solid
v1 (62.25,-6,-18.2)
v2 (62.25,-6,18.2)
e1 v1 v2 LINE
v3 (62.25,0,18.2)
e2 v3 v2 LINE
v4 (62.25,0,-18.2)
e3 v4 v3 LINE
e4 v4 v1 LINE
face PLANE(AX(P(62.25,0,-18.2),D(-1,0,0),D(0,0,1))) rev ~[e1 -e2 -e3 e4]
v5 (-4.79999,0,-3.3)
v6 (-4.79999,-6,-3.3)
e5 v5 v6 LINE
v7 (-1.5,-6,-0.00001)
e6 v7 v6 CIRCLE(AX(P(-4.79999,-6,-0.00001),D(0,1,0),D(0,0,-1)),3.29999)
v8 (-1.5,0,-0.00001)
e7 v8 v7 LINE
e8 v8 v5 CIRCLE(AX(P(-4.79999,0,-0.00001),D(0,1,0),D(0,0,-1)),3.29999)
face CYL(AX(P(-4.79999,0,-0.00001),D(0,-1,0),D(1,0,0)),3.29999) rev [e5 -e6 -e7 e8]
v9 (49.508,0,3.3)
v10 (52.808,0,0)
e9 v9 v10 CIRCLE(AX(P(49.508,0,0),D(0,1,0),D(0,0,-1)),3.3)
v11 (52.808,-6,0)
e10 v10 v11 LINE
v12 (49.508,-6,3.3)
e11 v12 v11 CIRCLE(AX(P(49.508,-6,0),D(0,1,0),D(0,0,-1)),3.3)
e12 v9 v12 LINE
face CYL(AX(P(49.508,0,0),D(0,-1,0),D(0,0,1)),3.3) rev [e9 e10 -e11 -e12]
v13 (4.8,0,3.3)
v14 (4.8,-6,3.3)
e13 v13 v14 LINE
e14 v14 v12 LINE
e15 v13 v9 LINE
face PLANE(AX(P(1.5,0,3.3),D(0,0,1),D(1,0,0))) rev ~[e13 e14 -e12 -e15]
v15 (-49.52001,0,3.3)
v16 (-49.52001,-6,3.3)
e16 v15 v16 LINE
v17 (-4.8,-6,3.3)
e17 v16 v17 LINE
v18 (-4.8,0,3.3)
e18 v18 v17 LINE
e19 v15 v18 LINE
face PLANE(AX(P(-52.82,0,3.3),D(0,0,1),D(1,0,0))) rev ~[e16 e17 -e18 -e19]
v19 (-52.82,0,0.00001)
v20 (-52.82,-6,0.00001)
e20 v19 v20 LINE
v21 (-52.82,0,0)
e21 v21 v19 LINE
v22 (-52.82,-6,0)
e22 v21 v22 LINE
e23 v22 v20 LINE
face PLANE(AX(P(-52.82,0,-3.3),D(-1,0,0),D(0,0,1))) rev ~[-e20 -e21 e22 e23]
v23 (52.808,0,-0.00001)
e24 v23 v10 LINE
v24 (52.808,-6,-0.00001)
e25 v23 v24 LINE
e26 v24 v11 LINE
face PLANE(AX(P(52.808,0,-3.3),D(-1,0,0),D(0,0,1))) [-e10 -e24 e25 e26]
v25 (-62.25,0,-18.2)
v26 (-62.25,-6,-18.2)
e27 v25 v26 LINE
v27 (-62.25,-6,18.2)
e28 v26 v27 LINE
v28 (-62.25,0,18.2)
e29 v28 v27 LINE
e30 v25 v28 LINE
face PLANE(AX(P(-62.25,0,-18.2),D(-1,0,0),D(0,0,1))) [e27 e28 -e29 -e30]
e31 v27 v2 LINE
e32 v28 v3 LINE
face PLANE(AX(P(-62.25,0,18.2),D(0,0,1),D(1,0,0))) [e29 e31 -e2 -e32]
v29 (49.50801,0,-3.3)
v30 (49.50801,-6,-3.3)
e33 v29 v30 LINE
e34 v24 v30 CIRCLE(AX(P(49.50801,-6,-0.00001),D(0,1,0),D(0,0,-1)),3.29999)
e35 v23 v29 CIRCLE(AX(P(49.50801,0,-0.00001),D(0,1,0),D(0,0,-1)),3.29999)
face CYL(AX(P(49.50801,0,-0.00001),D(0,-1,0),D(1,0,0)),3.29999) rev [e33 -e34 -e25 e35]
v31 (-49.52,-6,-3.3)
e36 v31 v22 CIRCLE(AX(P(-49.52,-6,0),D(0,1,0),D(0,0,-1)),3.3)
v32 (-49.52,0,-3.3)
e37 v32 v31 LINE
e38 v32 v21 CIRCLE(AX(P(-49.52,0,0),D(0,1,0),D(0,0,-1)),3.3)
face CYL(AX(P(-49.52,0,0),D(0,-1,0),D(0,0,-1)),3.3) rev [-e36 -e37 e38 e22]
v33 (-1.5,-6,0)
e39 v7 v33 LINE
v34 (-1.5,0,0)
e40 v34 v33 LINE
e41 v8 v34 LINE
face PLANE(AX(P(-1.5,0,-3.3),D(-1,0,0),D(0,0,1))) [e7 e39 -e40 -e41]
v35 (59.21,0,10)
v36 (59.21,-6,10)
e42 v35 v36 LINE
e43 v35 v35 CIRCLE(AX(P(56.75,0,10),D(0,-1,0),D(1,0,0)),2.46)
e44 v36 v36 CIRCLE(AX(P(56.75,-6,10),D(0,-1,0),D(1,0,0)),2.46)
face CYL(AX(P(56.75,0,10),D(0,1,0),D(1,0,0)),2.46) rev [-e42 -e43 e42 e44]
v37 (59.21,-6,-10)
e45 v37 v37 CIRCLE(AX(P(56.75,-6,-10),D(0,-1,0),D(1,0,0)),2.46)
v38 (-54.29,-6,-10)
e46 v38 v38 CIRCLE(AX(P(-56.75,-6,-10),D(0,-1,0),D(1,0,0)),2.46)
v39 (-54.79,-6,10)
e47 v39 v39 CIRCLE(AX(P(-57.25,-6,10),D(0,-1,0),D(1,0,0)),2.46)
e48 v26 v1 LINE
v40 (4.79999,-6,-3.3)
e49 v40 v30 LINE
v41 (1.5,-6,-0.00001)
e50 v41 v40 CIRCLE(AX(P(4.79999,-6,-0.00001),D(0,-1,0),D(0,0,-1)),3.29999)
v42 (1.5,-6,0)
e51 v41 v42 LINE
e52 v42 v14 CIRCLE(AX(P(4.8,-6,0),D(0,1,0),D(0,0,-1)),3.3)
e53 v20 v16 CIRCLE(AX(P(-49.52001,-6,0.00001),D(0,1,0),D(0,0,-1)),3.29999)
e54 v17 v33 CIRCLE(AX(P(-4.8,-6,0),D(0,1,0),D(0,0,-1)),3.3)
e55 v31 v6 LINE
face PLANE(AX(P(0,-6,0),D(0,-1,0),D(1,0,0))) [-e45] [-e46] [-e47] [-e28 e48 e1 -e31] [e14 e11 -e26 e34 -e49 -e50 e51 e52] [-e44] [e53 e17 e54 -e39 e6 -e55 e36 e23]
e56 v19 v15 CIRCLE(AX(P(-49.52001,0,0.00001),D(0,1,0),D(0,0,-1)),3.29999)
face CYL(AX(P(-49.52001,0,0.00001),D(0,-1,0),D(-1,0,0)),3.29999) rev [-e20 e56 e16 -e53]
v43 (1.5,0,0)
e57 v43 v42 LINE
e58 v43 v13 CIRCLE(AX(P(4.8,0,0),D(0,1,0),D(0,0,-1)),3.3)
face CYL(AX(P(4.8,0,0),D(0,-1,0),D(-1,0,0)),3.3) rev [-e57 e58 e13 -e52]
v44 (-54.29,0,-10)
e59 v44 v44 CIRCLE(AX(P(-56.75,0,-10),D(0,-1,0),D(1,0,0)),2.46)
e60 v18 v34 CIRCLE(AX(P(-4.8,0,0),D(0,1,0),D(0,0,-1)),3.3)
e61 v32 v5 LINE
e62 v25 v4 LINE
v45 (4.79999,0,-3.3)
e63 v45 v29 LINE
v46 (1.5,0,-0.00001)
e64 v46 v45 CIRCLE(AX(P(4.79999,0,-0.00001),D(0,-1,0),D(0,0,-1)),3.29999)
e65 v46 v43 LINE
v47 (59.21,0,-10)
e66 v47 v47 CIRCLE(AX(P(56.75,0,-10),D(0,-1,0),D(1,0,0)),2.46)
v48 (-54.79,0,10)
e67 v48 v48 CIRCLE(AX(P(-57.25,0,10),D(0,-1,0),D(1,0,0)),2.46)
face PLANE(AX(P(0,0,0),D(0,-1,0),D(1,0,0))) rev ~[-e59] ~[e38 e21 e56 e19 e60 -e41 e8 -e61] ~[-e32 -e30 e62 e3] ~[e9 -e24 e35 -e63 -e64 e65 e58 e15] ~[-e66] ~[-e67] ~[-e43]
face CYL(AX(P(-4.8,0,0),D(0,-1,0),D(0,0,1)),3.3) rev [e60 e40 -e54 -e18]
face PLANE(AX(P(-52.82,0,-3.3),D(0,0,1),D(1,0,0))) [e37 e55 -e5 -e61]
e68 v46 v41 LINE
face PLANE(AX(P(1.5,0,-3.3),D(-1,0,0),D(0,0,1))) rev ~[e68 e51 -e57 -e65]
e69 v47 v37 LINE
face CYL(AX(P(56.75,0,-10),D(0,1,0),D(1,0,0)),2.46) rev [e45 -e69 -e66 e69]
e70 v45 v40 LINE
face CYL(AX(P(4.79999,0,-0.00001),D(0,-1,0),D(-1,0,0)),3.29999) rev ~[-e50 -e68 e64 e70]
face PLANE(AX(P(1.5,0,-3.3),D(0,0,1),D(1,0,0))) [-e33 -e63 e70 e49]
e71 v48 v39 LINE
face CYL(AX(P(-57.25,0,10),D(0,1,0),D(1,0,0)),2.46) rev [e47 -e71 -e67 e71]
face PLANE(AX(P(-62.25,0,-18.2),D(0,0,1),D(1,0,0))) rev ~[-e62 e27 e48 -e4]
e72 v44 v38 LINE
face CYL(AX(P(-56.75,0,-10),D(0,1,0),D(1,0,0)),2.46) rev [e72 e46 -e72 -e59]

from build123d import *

# Parameters (mm, degrees)
F0_W     = 124.5
F0_H     = 36.4
F0_R     = 2.46
F0_W_2   = 51.32
F0_H_2   = 6.6
F0_W_3   = 51.308
F1_DEPTH = 6
F2_R     = 3.3
F3_R     = 3.29999
F4_R     = 3.3
F5_R     = 3.29999
F6_R     = 3.3
F7_R     = 3.29999
F8_R     = 3.3
F9_R     = 3.29999


# Not quite as in the source:
# - a fillet or chamfer is up to 0.001 mm smaller than in the source, because OpenCascade refuses the exact size


with BuildPart() as f1:
    # F0 (on Front) → F1 (new body)
    with BuildSketch(Plane.XZ):
        Rectangle(F0_W, F0_H)
        with Locations((-56.75, -10)):
            Circle(F0_R, mode=Mode.SUBTRACT)
        with Locations((-27.16, 0)):
            Rectangle(F0_W_2, F0_H_2, mode=Mode.SUBTRACT)
        with Locations((56.75, -10)):
            Circle(F0_R, mode=Mode.SUBTRACT)
        with Locations((27.154, 0)):
            Rectangle(F0_W_3, F0_H_2, mode=Mode.SUBTRACT)
        with Locations((-57.25, 10)):
            Circle(F0_R, mode=Mode.SUBTRACT)
        with Locations((56.75, 10)):
            Circle(F0_R, mode=Mode.SUBTRACT)
    extrude(amount=F1_DEPTH)

    # F2
    f2_edges = [f1.edges().sort_by_distance(p)[0] for p in [
        (-52.82, -3, -3.3),
    ]]
    fillet(f2_edges, radius=F2_R)

    # F3 (radius 3.3 in the source; OpenCascade refuses exactly that, so slightly less here)
    f3_edges = [f1.edges().sort_by_distance(p)[0] for p in [
        (-52.82, -3, 3.3),
    ]]
    fillet(f3_edges, radius=F3_R)

    # F4
    f4_edges = [f1.edges().sort_by_distance(p)[0] for p in [
        (-1.5, -3, 3.3),
    ]]
    fillet(f4_edges, radius=F4_R)

    # F5 (radius 3.3 in the source; OpenCascade refuses exactly that, so slightly less here)
    f5_edges = [f1.edges().sort_by_distance(p)[0] for p in [
        (-1.5, -3, -3.3),
    ]]
    fillet(f5_edges, radius=F5_R)

    # F6
    f6_edges = [f1.edges().sort_by_distance(p)[0] for p in [
        (1.5, -3, 3.3),
    ]]
    fillet(f6_edges, radius=F6_R)

    # F7 (radius 3.3 in the source; OpenCascade refuses exactly that, so slightly less here)
    f7_edges = [f1.edges().sort_by_distance(p)[0] for p in [
        (1.5, -3, -3.3),
    ]]
    fillet(f7_edges, radius=F7_R)

    # F8
    f8_edges = [f1.edges().sort_by_distance(p)[0] for p in [
        (52.808, -3, 3.3),
    ]]
    fillet(f8_edges, radius=F8_R)

    # F9 (radius 3.3 in the source; OpenCascade refuses exactly that, so slightly less here)
    f9_edges = [f1.edges().sort_by_distance(p)[0] for p in [
        (52.808, -3, -3.3),
    ]]
    fillet(f9_edges, radius=F9_R)


solid = f1.part
